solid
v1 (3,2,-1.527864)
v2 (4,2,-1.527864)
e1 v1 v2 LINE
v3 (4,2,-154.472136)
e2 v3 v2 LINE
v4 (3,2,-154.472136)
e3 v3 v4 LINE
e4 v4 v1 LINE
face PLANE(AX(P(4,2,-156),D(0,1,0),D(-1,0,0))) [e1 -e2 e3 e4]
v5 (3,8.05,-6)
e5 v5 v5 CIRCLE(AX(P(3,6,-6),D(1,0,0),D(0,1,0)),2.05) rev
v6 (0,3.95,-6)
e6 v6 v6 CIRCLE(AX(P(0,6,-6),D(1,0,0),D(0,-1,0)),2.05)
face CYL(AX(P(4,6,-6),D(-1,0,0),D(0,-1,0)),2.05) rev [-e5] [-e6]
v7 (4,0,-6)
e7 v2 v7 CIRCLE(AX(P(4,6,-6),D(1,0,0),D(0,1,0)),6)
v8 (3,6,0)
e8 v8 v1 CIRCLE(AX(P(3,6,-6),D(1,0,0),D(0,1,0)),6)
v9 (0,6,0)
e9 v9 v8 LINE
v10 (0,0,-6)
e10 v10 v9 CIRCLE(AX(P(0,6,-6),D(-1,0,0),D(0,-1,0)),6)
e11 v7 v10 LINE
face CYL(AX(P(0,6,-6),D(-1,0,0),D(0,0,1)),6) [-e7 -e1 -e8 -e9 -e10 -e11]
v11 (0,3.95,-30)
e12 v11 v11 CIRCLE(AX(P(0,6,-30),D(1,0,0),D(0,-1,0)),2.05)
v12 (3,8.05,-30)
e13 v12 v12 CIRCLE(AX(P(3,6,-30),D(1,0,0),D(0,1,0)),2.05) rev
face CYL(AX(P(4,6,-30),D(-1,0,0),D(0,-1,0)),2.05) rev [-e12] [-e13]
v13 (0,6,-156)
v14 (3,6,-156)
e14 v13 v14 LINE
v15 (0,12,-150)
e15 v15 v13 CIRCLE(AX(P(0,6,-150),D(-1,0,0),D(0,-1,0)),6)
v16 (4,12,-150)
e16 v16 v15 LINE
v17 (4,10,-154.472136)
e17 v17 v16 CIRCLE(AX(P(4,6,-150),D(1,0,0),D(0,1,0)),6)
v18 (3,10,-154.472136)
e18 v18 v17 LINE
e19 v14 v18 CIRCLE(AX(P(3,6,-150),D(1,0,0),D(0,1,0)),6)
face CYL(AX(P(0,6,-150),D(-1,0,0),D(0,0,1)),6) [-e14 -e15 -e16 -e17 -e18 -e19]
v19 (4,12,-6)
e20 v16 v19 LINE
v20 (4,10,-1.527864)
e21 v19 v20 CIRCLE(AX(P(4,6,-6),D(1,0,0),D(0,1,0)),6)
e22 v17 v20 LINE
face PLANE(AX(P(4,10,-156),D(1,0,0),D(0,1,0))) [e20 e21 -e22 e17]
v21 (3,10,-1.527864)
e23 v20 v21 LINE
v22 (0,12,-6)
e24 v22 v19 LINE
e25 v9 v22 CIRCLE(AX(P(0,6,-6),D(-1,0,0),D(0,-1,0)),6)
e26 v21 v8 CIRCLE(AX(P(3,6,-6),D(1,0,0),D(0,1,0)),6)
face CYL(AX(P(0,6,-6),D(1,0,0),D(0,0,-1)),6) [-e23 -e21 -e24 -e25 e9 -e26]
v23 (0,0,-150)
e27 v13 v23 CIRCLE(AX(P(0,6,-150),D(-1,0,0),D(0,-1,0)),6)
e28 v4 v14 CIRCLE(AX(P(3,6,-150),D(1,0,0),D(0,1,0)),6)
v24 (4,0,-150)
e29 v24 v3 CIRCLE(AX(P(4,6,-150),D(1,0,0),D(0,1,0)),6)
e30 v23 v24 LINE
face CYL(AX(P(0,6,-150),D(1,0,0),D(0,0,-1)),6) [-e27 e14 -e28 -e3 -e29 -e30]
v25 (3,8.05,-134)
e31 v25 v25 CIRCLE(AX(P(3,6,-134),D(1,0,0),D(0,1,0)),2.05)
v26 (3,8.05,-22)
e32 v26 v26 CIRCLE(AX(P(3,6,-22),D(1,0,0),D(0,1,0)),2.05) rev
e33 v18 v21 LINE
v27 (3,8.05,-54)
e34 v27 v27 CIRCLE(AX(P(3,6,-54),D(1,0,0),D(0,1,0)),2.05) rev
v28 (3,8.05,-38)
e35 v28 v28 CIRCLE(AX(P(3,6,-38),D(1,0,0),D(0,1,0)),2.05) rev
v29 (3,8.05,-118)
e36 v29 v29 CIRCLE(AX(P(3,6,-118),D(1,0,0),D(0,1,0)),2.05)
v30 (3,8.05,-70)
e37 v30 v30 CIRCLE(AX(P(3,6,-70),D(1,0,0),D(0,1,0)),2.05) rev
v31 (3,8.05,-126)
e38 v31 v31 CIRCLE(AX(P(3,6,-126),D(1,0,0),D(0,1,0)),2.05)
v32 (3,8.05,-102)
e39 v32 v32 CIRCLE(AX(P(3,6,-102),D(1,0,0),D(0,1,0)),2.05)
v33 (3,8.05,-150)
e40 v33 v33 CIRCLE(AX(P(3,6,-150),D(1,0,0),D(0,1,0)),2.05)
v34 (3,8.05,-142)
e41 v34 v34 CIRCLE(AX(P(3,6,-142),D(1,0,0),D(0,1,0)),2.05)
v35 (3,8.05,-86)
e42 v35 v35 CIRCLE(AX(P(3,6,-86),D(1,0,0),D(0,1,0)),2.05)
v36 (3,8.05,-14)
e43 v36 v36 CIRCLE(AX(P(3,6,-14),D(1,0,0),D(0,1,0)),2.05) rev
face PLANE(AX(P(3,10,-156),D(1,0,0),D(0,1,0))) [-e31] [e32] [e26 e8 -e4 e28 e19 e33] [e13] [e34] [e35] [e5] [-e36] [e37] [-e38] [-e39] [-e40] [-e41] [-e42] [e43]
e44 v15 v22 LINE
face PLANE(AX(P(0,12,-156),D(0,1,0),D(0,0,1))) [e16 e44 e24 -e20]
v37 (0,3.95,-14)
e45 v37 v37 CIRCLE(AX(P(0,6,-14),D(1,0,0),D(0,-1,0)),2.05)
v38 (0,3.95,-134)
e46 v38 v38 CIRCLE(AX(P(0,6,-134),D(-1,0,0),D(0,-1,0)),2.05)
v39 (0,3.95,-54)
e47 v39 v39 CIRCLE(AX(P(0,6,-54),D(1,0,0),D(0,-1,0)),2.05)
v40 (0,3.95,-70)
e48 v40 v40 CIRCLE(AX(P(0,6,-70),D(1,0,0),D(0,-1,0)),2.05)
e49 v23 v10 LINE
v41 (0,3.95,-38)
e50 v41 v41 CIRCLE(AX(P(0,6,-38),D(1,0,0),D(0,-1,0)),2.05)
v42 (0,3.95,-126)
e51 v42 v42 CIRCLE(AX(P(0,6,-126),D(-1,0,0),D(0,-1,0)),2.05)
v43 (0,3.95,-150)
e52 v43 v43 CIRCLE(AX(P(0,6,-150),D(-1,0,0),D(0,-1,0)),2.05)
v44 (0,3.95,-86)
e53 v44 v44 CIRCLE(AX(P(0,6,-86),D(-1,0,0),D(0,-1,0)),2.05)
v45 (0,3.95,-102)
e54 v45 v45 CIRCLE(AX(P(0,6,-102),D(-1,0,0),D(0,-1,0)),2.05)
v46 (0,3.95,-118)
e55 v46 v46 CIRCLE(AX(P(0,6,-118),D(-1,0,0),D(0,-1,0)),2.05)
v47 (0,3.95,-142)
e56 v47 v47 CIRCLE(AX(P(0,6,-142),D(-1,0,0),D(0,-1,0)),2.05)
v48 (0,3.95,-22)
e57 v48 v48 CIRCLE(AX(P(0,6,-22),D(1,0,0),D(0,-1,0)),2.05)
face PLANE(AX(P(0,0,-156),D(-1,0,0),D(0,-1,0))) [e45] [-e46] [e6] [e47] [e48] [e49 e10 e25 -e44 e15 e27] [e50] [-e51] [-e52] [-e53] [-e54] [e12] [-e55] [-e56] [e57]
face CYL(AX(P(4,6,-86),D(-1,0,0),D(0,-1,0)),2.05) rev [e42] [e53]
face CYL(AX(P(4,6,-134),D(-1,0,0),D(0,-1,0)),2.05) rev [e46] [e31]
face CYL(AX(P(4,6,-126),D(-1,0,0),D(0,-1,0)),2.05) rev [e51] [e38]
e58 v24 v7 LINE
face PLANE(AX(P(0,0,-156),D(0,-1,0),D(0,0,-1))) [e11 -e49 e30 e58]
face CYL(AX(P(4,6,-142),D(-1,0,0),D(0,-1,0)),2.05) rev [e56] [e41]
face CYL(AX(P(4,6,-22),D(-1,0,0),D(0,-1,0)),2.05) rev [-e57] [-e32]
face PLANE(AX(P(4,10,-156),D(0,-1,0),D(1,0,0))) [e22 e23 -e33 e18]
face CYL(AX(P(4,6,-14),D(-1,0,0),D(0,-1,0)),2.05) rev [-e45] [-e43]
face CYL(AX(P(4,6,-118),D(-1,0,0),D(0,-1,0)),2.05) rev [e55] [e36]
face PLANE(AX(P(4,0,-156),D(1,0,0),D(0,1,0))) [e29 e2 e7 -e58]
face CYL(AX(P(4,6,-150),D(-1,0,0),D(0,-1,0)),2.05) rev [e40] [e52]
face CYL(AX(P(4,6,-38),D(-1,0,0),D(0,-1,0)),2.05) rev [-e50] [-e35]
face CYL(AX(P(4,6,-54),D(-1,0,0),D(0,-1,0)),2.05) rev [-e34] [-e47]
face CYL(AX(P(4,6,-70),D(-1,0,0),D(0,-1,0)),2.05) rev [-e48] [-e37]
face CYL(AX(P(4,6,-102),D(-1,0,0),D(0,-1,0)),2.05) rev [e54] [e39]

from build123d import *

# Parameters (mm, degrees)
BOSS_EXTRUDE1_DEPTH     = 156
FILLET1_R               = 6
SKETCH2_R               = 2.05
CUT_EXTRUDE1_DEPTH      = 157.511980372
LPATTERN1_COUNT         = 9
LPATTERN1_PITCH         = 8
MIRROR1_COPY_1_SKETCH_R = 2.05
MIRROR1_COPY_1_DEPTH    = 157.511980372
MIRROR1_COPY_2_SKETCH_R = 2.05
MIRROR1_COPY_2_DEPTH    = 157.511980372
MIRROR1_COPY_3_SKETCH_R = 2.05
MIRROR1_COPY_3_DEPTH    = 157.511980372
MIRROR1_COPY_4_SKETCH_R = 2.05
MIRROR1_COPY_4_DEPTH    = 157.511980372
MIRROR1_COPY_5_SKETCH_R = 2.05
MIRROR1_COPY_5_DEPTH    = 157.511980372
MIRROR1_COPY_6_SKETCH_R = 2.05
MIRROR1_COPY_6_DEPTH    = 157.511980372


with BuildPart() as part:
    # Sketch1 → Boss-Extrude1 (new body)
    with BuildSketch(Plane.XY):
        Polygon((0, 0), (4, 0), (4, 2), (3, 2), (3, 10), (4, 10), (4, 12), (0, 12), align=None)
    extrude(amount=-BOSS_EXTRUDE1_DEPTH)

    # Fillet1
    fillet1_edges = [part.edges().sort_by_distance(p)[0] for p in [
        (2, 12, 0),
        (2, 0, 0),
        (2, 0, -156),
        (2, 12, -156),
    ]]
    fillet(fillet1_edges, radius=FILLET1_R - 0.0001)  # a hair under: the kernel refuses the full size

    # Sketch2 → Cut-Extrude1 (cut, through all)
    with BuildSketch(Plane.ZY):
        with Locations(Location((-150, 6, 0), (0, 0, 270))):
            Circle(SKETCH2_R)
    cut_extrude1 = extrude(amount=-CUT_EXTRUDE1_DEPTH, mode=Mode.SUBTRACT)

    # LPattern1: Cut-Extrude1 ×9, 2 skipped
    with Locations(*[(0, 0, i * LPATTERN1_PITCH) for i in range(1, LPATTERN1_COUNT) if i not in (5, 7)]):
        add(cut_extrude1, mode=Mode.SUBTRACT)

    # Mirror1: Cut-Extrude1 across plane
    add(cut_extrude1.mirror(Plane.XY.offset(-78)), mode=Mode.SUBTRACT)

    # Mirror1 copy 1 sketch → Mirror1 copy 1 (cut, through all)
    with BuildSketch(Plane(origin=(0, 0, -164), x_dir=(0, 0, -1), z_dir=(-1, 0, 0))):
        with Locations((-150, -6)):
            Circle(MIRROR1_COPY_1_SKETCH_R)
    extrude(amount=-MIRROR1_COPY_1_DEPTH, mode=Mode.SUBTRACT)

    # Mirror1 copy 2 sketch → Mirror1 copy 2 (cut, through all)
    with BuildSketch(Plane(origin=(0, 0, -172), x_dir=(0, 0, -1), z_dir=(-1, 0, 0))):
        with Locations((-150, -6)):
            Circle(MIRROR1_COPY_2_SKETCH_R)
    extrude(amount=-MIRROR1_COPY_2_DEPTH, mode=Mode.SUBTRACT)

    # Mirror1 copy 3 sketch → Mirror1 copy 3 (cut, through all)
    with BuildSketch(Plane(origin=(0, 0, -180), x_dir=(0, 0, -1), z_dir=(-1, 0, 0))):
        with Locations((-150, -6)):
            Circle(MIRROR1_COPY_3_SKETCH_R)
    extrude(amount=-MIRROR1_COPY_3_DEPTH, mode=Mode.SUBTRACT)

    # Mirror1 copy 4 sketch → Mirror1 copy 4 (cut, through all)
    with BuildSketch(Plane(origin=(0, 0, -188), x_dir=(0, 0, -1), z_dir=(-1, 0, 0))):
        with Locations((-150, -6)):
            Circle(MIRROR1_COPY_4_SKETCH_R)
    extrude(amount=-MIRROR1_COPY_4_DEPTH, mode=Mode.SUBTRACT)

    # Mirror1 copy 5 sketch → Mirror1 copy 5 (cut, through all)
    with BuildSketch(Plane(origin=(0, 0, -204), x_dir=(0, 0, -1), z_dir=(-1, 0, 0))):
        with Locations((-150, -6)):
            Circle(MIRROR1_COPY_5_SKETCH_R)
    extrude(amount=-MIRROR1_COPY_5_DEPTH, mode=Mode.SUBTRACT)

    # Mirror1 copy 6 sketch → Mirror1 copy 6 (cut, through all)
    with BuildSketch(Plane(origin=(0, 0, -220), x_dir=(0, 0, -1), z_dir=(-1, 0, 0))):
        with Locations((-150, -6)):
            Circle(MIRROR1_COPY_6_SKETCH_R)
    extrude(amount=-MIRROR1_COPY_6_DEPTH, mode=Mode.SUBTRACT)


solid = part.part
